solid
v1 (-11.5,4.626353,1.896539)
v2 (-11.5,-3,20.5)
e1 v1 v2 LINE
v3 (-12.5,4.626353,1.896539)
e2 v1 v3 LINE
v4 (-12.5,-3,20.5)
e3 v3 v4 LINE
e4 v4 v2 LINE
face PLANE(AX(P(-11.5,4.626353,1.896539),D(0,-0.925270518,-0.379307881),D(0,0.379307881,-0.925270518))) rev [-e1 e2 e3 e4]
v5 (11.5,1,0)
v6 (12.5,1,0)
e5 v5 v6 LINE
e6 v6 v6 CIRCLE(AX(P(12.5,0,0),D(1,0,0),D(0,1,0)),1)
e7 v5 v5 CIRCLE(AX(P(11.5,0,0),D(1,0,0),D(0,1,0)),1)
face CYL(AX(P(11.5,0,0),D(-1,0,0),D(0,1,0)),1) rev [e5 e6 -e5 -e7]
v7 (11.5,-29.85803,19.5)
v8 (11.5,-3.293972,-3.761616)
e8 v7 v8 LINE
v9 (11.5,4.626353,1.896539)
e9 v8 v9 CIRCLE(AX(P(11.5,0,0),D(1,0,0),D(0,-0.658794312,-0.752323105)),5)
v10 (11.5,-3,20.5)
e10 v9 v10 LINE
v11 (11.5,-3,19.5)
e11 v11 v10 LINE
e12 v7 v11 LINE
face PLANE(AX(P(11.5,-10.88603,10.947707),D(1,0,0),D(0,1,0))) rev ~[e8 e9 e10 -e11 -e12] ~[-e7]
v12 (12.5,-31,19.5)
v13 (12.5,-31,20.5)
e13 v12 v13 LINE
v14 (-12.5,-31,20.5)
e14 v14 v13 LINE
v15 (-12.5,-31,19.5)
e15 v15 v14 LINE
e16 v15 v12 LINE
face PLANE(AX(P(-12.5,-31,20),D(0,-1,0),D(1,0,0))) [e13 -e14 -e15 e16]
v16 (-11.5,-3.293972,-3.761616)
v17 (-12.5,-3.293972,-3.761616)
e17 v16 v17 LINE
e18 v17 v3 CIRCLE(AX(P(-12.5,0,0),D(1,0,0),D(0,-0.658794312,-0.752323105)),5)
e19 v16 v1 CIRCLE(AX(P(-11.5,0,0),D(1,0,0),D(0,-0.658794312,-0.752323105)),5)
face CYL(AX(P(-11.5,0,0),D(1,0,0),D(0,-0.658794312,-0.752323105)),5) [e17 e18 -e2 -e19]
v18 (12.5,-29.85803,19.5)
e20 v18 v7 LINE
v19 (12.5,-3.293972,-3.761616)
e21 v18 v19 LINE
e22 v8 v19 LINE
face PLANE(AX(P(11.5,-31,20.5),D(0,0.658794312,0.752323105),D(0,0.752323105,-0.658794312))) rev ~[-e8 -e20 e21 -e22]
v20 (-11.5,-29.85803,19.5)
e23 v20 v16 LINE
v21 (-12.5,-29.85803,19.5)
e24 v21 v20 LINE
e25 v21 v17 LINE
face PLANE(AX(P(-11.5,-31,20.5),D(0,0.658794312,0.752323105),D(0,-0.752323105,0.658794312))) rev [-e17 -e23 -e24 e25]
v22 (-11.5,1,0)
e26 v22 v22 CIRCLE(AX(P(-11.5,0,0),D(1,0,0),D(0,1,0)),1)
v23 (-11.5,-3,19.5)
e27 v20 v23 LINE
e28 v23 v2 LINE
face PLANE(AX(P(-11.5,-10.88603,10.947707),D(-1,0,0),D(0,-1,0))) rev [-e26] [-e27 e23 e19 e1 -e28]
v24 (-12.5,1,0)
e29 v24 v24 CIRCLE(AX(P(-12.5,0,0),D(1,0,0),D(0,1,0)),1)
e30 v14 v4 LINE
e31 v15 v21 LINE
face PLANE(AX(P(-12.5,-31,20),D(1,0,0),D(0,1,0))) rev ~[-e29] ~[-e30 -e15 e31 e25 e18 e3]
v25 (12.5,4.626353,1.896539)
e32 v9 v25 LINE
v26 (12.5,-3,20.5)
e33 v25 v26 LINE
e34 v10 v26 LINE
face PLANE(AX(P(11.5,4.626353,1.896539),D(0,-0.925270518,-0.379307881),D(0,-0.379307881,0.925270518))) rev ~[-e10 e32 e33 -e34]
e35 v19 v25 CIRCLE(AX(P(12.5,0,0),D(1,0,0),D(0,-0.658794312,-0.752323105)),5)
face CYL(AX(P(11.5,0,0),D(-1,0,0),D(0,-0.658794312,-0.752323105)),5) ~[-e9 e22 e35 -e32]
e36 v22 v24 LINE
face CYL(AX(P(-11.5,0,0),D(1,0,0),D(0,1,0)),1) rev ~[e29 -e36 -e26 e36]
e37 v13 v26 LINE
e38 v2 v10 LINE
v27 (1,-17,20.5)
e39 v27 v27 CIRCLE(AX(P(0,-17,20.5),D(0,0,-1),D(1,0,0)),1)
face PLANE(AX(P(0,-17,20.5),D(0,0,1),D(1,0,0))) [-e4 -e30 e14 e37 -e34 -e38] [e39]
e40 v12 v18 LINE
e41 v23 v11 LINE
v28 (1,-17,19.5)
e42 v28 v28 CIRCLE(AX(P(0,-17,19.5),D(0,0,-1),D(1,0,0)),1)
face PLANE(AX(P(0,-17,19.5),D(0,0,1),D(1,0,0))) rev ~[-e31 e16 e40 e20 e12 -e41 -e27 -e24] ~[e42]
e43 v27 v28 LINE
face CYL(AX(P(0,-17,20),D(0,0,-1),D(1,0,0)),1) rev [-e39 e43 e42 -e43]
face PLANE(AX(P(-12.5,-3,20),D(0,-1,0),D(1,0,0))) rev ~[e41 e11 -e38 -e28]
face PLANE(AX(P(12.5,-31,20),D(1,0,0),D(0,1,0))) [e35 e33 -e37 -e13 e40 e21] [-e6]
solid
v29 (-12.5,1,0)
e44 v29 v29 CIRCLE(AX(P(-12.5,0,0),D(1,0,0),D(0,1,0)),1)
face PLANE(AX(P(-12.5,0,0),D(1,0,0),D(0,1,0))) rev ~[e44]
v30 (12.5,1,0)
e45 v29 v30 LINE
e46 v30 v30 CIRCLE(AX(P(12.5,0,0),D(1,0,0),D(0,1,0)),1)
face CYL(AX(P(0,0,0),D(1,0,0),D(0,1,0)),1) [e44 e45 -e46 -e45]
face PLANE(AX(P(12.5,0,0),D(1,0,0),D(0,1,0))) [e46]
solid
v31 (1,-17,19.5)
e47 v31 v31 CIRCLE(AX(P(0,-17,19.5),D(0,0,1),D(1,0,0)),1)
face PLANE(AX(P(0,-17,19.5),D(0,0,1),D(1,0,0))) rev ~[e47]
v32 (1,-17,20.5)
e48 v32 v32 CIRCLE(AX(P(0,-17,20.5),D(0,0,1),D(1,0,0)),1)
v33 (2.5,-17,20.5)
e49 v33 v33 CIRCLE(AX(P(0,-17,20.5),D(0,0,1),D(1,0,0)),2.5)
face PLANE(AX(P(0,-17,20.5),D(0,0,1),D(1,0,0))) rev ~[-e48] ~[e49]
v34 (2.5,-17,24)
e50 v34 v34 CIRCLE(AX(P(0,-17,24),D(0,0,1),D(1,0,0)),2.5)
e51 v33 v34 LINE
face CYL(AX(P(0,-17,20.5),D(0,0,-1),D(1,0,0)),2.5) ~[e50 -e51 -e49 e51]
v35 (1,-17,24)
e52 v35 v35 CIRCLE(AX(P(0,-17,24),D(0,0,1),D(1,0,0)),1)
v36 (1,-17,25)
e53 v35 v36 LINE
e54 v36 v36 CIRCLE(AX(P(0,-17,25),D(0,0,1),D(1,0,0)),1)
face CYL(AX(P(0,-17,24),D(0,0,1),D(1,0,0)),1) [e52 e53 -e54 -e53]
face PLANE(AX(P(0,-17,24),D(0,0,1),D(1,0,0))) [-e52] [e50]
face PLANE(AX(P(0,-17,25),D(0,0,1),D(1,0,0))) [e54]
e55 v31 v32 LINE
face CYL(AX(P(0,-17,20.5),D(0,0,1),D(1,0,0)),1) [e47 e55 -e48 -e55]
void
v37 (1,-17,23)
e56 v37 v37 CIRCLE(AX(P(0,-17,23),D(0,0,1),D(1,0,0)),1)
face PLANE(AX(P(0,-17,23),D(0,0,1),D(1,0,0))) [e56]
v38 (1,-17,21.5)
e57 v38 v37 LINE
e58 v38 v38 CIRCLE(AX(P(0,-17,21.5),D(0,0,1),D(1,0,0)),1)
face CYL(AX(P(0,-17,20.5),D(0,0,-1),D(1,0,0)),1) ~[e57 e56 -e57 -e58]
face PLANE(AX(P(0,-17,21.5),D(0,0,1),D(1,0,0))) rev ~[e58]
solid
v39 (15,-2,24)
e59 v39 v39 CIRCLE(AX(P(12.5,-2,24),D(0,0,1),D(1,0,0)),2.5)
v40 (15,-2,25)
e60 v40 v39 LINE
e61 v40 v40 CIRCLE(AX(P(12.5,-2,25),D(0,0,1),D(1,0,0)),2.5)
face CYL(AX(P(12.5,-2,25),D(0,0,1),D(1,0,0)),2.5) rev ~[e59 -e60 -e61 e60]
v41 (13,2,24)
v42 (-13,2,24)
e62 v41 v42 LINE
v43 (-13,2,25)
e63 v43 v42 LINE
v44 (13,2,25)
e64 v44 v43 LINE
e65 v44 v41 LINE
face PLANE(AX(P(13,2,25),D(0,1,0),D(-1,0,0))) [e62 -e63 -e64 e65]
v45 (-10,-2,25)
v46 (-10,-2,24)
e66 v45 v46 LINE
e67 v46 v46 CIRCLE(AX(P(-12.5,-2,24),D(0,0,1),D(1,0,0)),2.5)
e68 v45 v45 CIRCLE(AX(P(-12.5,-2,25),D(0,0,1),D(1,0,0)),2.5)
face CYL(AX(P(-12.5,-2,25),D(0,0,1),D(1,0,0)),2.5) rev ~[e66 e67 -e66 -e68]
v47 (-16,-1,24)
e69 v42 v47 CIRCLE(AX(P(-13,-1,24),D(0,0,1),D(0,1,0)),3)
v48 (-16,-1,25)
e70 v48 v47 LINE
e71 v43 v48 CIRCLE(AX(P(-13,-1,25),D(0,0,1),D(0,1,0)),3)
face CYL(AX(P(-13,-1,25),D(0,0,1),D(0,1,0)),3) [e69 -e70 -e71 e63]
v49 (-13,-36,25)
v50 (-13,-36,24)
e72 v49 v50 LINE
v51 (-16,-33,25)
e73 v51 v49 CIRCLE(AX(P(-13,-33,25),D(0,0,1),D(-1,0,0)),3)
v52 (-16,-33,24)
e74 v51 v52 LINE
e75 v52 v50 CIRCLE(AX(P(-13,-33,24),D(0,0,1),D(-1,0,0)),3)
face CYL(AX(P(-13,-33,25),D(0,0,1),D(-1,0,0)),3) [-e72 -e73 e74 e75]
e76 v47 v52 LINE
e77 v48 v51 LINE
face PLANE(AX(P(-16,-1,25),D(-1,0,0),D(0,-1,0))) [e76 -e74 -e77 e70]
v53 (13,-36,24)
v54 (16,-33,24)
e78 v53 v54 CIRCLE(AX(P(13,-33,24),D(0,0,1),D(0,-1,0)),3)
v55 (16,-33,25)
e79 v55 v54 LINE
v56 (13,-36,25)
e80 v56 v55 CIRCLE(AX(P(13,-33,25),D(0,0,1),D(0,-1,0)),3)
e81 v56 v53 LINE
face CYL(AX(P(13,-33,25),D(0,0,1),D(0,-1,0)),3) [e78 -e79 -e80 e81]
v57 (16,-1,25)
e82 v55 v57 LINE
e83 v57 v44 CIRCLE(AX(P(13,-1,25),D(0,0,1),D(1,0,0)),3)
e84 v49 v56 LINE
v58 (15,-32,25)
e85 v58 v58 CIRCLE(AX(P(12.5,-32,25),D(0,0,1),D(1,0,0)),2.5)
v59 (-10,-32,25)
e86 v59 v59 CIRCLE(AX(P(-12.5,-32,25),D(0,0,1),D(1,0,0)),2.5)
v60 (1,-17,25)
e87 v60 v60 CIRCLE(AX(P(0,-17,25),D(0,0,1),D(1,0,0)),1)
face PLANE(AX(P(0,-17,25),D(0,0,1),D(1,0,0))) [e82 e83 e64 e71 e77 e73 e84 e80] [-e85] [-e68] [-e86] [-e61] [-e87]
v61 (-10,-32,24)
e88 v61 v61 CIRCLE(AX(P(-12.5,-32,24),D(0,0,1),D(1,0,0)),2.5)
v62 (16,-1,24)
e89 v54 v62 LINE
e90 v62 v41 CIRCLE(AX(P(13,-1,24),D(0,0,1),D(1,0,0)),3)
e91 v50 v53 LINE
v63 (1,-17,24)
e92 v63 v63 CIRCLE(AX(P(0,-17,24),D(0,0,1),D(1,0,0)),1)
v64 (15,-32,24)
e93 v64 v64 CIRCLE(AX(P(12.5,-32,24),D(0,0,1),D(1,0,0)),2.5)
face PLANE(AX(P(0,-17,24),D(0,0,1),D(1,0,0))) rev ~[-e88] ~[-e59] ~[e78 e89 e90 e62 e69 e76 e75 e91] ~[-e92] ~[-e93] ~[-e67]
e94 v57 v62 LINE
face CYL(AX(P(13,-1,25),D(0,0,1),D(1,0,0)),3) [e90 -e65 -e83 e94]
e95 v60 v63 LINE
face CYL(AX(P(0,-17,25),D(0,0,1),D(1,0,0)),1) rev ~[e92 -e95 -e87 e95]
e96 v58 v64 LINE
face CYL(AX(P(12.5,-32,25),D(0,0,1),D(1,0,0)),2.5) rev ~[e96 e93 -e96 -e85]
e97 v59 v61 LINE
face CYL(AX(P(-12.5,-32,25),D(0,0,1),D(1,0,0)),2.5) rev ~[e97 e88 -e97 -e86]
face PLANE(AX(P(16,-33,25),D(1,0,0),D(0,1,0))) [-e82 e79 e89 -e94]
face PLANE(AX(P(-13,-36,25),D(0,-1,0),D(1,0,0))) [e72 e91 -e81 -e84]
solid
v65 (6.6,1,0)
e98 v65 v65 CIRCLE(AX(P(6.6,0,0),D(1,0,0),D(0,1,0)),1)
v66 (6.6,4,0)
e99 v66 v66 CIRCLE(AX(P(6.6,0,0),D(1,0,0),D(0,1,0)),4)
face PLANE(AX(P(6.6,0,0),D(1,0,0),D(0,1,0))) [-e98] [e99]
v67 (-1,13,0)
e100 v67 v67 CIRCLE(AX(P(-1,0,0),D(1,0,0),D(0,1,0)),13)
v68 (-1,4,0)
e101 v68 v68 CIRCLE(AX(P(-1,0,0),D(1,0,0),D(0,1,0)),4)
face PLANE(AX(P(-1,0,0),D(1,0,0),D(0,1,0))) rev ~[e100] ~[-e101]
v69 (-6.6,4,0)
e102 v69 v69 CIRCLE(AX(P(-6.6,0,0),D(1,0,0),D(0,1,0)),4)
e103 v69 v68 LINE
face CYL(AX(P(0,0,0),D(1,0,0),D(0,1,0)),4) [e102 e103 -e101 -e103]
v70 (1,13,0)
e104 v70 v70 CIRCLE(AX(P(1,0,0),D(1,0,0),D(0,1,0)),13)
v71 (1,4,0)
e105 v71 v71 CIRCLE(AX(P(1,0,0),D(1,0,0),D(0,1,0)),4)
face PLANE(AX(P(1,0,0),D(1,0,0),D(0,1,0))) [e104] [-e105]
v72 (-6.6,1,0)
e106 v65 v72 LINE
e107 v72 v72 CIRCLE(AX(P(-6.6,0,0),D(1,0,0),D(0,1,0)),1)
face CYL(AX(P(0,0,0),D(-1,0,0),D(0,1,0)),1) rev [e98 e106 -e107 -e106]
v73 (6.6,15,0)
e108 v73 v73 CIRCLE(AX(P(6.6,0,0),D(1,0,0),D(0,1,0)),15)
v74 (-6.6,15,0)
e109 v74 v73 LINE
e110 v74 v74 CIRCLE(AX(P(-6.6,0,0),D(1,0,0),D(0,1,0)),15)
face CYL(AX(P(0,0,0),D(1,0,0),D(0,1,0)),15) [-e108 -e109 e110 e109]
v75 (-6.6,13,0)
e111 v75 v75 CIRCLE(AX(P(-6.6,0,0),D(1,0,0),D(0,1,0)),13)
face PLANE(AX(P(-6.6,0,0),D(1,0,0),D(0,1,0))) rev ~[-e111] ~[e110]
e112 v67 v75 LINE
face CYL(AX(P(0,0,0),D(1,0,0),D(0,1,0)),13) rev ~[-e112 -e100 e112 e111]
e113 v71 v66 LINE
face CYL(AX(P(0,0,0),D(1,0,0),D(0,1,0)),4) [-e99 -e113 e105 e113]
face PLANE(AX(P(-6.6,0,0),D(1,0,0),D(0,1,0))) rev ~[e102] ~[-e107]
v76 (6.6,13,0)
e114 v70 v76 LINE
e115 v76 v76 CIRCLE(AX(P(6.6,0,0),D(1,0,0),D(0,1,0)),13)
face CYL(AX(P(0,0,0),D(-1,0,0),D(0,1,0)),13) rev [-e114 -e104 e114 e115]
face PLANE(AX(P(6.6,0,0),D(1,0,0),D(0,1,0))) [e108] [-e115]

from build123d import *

# Parameters (mm, degrees)
F0_R      = 13
F0_R_2    = 4
F1_DEPTH  = 1
F0_R_3    = 15
F0_R_4    = 1
F2_DEPTH  = 6.6
F4_W      = 25
F4_H      = 28
F4_R      = 1
F5_DEPTH  = 0.5
F7_R      = 1
F8_DEPTH  = 1
F11_R     = 2.5
F11_R_2   = 1
F12_DEPTH = 1
F13_R     = 1
F14_DEPTH = 1
F13_R_2   = 2.5
F15_DEPTH = 3.5
F16_R     = 1
F17_DEPTH = 1
F18_R     = 1
F19_DEPTH = 12.5


with BuildPart() as f1:
    # F0 (on Right) → F1 (new body, symmetric)
    with BuildSketch(Plane.YZ):
        Circle(F0_R)
        Circle(F0_R_2, mode=Mode.SUBTRACT)
    extrude(amount=F1_DEPTH, both=True)

    # F0 (on Right) → F2 (join, symmetric)
    with BuildSketch(Plane.YZ):
        Circle(F0_R_3)
        Circle(F0_R, mode=Mode.SUBTRACT)
        Circle(F0_R_2)
        Circle(F0_R_4, mode=Mode.SUBTRACT)
    extrude(amount=F2_DEPTH, both=True)


with BuildPart() as f5:
    # F4 (on offset) → F5 (new body, symmetric)
    with BuildSketch(Plane.XY.offset(20)):
        with Locations((0, -17)):
            Rectangle(F4_W, F4_H)
        with Locations((0, -17)):
            Circle(F4_R, mode=Mode.SUBTRACT)
    extrude(amount=F5_DEPTH, both=True)

    # F7 (on offset) → F8 (join)
    with BuildSketch(Plane.YZ.offset(11.5)):
        with BuildLine():
            Line((-3, 20.5), (-31, 20.5))
            Line((-31, 20.5), (-3.2939715582, -3.7616155271))
            ThreePointArc((-3.2939715582, -3.7616155271), (2.9064564522, -4.0684777118), (4.6263525904, 1.8965394035))
            Line((4.6263525904, 1.8965394035), (-3, 20.5))
        make_face()
        Circle(F7_R, mode=Mode.SUBTRACT)
    extrude(amount=F8_DEPTH)

    # F9: F5 across plane


with BuildPart() as f5_1:
    add(f5.part)
    add(f5.part.mirror(Plane.YZ))


with BuildPart() as f12:
    # F11 (on offset) → F12 (new body)
    with BuildSketch(Plane.XY.offset(25)):
        with BuildLine():
            ThreePointArc((-16, -33), (-15.1213203436, -35.1213203436), (-13, -36))
            Line((-13, -36), (13, -36))
            ThreePointArc((13, -36), (15.1213203436, -35.1213203436), (16, -33))
            Line((16, -33), (16, -1))
            ThreePointArc((16, -1), (15.1213203436, 1.1213203436), (13, 2))
            Line((13, 2), (-13, 2))
            ThreePointArc((-13, 2), (-15.1213203436, 1.1213203436), (-16, -1))
            Line((-16, -1), (-16, -33))
        make_face()
        with Locations((-12.5, -32)):
            Circle(F11_R, mode=Mode.SUBTRACT)
        with Locations((12.5, -32)):
            Circle(F11_R, mode=Mode.SUBTRACT)
        with Locations((-12.5, -2)):
            Circle(F11_R, mode=Mode.SUBTRACT)
        with Locations((0, -17)):
            Circle(F11_R_2, mode=Mode.SUBTRACT)
        with Locations((12.5, -2)):
            Circle(F11_R, mode=Mode.SUBTRACT)
    extrude(amount=-F12_DEPTH)


with BuildPart() as f14:
    # F13 (on face) → F14 (new body, symmetric)
    with BuildSketch(Plane.XY.offset(20.5)):
        with Locations((0, -17)):
            Circle(F13_R)
    extrude(amount=F14_DEPTH, both=True)

    # F13 (on face) → F15 (join)
    with BuildSketch(Plane.XY.offset(20.5)):
        with Locations((0, -17)):
            Circle(F13_R_2)
        with Locations((0, -17)):
            Circle(F13_R, mode=Mode.SUBTRACT)
    extrude(amount=F15_DEPTH)

    # F16 (on face) → F17 (join, symmetric)
    with BuildSketch(Plane.XY.offset(24)):
        with Locations((0, -17)):
            Circle(F16_R)
    extrude(amount=F17_DEPTH, both=True)


with BuildPart() as f19:
    # F18 (on Right) → F19 (new body, symmetric)
    with BuildSketch(Plane.YZ):
        Circle(F18_R)
    extrude(amount=F19_DEPTH, both=True)


solid = Compound([f1.part, f5_1.part, f12.part, f14.part, f19.part])
